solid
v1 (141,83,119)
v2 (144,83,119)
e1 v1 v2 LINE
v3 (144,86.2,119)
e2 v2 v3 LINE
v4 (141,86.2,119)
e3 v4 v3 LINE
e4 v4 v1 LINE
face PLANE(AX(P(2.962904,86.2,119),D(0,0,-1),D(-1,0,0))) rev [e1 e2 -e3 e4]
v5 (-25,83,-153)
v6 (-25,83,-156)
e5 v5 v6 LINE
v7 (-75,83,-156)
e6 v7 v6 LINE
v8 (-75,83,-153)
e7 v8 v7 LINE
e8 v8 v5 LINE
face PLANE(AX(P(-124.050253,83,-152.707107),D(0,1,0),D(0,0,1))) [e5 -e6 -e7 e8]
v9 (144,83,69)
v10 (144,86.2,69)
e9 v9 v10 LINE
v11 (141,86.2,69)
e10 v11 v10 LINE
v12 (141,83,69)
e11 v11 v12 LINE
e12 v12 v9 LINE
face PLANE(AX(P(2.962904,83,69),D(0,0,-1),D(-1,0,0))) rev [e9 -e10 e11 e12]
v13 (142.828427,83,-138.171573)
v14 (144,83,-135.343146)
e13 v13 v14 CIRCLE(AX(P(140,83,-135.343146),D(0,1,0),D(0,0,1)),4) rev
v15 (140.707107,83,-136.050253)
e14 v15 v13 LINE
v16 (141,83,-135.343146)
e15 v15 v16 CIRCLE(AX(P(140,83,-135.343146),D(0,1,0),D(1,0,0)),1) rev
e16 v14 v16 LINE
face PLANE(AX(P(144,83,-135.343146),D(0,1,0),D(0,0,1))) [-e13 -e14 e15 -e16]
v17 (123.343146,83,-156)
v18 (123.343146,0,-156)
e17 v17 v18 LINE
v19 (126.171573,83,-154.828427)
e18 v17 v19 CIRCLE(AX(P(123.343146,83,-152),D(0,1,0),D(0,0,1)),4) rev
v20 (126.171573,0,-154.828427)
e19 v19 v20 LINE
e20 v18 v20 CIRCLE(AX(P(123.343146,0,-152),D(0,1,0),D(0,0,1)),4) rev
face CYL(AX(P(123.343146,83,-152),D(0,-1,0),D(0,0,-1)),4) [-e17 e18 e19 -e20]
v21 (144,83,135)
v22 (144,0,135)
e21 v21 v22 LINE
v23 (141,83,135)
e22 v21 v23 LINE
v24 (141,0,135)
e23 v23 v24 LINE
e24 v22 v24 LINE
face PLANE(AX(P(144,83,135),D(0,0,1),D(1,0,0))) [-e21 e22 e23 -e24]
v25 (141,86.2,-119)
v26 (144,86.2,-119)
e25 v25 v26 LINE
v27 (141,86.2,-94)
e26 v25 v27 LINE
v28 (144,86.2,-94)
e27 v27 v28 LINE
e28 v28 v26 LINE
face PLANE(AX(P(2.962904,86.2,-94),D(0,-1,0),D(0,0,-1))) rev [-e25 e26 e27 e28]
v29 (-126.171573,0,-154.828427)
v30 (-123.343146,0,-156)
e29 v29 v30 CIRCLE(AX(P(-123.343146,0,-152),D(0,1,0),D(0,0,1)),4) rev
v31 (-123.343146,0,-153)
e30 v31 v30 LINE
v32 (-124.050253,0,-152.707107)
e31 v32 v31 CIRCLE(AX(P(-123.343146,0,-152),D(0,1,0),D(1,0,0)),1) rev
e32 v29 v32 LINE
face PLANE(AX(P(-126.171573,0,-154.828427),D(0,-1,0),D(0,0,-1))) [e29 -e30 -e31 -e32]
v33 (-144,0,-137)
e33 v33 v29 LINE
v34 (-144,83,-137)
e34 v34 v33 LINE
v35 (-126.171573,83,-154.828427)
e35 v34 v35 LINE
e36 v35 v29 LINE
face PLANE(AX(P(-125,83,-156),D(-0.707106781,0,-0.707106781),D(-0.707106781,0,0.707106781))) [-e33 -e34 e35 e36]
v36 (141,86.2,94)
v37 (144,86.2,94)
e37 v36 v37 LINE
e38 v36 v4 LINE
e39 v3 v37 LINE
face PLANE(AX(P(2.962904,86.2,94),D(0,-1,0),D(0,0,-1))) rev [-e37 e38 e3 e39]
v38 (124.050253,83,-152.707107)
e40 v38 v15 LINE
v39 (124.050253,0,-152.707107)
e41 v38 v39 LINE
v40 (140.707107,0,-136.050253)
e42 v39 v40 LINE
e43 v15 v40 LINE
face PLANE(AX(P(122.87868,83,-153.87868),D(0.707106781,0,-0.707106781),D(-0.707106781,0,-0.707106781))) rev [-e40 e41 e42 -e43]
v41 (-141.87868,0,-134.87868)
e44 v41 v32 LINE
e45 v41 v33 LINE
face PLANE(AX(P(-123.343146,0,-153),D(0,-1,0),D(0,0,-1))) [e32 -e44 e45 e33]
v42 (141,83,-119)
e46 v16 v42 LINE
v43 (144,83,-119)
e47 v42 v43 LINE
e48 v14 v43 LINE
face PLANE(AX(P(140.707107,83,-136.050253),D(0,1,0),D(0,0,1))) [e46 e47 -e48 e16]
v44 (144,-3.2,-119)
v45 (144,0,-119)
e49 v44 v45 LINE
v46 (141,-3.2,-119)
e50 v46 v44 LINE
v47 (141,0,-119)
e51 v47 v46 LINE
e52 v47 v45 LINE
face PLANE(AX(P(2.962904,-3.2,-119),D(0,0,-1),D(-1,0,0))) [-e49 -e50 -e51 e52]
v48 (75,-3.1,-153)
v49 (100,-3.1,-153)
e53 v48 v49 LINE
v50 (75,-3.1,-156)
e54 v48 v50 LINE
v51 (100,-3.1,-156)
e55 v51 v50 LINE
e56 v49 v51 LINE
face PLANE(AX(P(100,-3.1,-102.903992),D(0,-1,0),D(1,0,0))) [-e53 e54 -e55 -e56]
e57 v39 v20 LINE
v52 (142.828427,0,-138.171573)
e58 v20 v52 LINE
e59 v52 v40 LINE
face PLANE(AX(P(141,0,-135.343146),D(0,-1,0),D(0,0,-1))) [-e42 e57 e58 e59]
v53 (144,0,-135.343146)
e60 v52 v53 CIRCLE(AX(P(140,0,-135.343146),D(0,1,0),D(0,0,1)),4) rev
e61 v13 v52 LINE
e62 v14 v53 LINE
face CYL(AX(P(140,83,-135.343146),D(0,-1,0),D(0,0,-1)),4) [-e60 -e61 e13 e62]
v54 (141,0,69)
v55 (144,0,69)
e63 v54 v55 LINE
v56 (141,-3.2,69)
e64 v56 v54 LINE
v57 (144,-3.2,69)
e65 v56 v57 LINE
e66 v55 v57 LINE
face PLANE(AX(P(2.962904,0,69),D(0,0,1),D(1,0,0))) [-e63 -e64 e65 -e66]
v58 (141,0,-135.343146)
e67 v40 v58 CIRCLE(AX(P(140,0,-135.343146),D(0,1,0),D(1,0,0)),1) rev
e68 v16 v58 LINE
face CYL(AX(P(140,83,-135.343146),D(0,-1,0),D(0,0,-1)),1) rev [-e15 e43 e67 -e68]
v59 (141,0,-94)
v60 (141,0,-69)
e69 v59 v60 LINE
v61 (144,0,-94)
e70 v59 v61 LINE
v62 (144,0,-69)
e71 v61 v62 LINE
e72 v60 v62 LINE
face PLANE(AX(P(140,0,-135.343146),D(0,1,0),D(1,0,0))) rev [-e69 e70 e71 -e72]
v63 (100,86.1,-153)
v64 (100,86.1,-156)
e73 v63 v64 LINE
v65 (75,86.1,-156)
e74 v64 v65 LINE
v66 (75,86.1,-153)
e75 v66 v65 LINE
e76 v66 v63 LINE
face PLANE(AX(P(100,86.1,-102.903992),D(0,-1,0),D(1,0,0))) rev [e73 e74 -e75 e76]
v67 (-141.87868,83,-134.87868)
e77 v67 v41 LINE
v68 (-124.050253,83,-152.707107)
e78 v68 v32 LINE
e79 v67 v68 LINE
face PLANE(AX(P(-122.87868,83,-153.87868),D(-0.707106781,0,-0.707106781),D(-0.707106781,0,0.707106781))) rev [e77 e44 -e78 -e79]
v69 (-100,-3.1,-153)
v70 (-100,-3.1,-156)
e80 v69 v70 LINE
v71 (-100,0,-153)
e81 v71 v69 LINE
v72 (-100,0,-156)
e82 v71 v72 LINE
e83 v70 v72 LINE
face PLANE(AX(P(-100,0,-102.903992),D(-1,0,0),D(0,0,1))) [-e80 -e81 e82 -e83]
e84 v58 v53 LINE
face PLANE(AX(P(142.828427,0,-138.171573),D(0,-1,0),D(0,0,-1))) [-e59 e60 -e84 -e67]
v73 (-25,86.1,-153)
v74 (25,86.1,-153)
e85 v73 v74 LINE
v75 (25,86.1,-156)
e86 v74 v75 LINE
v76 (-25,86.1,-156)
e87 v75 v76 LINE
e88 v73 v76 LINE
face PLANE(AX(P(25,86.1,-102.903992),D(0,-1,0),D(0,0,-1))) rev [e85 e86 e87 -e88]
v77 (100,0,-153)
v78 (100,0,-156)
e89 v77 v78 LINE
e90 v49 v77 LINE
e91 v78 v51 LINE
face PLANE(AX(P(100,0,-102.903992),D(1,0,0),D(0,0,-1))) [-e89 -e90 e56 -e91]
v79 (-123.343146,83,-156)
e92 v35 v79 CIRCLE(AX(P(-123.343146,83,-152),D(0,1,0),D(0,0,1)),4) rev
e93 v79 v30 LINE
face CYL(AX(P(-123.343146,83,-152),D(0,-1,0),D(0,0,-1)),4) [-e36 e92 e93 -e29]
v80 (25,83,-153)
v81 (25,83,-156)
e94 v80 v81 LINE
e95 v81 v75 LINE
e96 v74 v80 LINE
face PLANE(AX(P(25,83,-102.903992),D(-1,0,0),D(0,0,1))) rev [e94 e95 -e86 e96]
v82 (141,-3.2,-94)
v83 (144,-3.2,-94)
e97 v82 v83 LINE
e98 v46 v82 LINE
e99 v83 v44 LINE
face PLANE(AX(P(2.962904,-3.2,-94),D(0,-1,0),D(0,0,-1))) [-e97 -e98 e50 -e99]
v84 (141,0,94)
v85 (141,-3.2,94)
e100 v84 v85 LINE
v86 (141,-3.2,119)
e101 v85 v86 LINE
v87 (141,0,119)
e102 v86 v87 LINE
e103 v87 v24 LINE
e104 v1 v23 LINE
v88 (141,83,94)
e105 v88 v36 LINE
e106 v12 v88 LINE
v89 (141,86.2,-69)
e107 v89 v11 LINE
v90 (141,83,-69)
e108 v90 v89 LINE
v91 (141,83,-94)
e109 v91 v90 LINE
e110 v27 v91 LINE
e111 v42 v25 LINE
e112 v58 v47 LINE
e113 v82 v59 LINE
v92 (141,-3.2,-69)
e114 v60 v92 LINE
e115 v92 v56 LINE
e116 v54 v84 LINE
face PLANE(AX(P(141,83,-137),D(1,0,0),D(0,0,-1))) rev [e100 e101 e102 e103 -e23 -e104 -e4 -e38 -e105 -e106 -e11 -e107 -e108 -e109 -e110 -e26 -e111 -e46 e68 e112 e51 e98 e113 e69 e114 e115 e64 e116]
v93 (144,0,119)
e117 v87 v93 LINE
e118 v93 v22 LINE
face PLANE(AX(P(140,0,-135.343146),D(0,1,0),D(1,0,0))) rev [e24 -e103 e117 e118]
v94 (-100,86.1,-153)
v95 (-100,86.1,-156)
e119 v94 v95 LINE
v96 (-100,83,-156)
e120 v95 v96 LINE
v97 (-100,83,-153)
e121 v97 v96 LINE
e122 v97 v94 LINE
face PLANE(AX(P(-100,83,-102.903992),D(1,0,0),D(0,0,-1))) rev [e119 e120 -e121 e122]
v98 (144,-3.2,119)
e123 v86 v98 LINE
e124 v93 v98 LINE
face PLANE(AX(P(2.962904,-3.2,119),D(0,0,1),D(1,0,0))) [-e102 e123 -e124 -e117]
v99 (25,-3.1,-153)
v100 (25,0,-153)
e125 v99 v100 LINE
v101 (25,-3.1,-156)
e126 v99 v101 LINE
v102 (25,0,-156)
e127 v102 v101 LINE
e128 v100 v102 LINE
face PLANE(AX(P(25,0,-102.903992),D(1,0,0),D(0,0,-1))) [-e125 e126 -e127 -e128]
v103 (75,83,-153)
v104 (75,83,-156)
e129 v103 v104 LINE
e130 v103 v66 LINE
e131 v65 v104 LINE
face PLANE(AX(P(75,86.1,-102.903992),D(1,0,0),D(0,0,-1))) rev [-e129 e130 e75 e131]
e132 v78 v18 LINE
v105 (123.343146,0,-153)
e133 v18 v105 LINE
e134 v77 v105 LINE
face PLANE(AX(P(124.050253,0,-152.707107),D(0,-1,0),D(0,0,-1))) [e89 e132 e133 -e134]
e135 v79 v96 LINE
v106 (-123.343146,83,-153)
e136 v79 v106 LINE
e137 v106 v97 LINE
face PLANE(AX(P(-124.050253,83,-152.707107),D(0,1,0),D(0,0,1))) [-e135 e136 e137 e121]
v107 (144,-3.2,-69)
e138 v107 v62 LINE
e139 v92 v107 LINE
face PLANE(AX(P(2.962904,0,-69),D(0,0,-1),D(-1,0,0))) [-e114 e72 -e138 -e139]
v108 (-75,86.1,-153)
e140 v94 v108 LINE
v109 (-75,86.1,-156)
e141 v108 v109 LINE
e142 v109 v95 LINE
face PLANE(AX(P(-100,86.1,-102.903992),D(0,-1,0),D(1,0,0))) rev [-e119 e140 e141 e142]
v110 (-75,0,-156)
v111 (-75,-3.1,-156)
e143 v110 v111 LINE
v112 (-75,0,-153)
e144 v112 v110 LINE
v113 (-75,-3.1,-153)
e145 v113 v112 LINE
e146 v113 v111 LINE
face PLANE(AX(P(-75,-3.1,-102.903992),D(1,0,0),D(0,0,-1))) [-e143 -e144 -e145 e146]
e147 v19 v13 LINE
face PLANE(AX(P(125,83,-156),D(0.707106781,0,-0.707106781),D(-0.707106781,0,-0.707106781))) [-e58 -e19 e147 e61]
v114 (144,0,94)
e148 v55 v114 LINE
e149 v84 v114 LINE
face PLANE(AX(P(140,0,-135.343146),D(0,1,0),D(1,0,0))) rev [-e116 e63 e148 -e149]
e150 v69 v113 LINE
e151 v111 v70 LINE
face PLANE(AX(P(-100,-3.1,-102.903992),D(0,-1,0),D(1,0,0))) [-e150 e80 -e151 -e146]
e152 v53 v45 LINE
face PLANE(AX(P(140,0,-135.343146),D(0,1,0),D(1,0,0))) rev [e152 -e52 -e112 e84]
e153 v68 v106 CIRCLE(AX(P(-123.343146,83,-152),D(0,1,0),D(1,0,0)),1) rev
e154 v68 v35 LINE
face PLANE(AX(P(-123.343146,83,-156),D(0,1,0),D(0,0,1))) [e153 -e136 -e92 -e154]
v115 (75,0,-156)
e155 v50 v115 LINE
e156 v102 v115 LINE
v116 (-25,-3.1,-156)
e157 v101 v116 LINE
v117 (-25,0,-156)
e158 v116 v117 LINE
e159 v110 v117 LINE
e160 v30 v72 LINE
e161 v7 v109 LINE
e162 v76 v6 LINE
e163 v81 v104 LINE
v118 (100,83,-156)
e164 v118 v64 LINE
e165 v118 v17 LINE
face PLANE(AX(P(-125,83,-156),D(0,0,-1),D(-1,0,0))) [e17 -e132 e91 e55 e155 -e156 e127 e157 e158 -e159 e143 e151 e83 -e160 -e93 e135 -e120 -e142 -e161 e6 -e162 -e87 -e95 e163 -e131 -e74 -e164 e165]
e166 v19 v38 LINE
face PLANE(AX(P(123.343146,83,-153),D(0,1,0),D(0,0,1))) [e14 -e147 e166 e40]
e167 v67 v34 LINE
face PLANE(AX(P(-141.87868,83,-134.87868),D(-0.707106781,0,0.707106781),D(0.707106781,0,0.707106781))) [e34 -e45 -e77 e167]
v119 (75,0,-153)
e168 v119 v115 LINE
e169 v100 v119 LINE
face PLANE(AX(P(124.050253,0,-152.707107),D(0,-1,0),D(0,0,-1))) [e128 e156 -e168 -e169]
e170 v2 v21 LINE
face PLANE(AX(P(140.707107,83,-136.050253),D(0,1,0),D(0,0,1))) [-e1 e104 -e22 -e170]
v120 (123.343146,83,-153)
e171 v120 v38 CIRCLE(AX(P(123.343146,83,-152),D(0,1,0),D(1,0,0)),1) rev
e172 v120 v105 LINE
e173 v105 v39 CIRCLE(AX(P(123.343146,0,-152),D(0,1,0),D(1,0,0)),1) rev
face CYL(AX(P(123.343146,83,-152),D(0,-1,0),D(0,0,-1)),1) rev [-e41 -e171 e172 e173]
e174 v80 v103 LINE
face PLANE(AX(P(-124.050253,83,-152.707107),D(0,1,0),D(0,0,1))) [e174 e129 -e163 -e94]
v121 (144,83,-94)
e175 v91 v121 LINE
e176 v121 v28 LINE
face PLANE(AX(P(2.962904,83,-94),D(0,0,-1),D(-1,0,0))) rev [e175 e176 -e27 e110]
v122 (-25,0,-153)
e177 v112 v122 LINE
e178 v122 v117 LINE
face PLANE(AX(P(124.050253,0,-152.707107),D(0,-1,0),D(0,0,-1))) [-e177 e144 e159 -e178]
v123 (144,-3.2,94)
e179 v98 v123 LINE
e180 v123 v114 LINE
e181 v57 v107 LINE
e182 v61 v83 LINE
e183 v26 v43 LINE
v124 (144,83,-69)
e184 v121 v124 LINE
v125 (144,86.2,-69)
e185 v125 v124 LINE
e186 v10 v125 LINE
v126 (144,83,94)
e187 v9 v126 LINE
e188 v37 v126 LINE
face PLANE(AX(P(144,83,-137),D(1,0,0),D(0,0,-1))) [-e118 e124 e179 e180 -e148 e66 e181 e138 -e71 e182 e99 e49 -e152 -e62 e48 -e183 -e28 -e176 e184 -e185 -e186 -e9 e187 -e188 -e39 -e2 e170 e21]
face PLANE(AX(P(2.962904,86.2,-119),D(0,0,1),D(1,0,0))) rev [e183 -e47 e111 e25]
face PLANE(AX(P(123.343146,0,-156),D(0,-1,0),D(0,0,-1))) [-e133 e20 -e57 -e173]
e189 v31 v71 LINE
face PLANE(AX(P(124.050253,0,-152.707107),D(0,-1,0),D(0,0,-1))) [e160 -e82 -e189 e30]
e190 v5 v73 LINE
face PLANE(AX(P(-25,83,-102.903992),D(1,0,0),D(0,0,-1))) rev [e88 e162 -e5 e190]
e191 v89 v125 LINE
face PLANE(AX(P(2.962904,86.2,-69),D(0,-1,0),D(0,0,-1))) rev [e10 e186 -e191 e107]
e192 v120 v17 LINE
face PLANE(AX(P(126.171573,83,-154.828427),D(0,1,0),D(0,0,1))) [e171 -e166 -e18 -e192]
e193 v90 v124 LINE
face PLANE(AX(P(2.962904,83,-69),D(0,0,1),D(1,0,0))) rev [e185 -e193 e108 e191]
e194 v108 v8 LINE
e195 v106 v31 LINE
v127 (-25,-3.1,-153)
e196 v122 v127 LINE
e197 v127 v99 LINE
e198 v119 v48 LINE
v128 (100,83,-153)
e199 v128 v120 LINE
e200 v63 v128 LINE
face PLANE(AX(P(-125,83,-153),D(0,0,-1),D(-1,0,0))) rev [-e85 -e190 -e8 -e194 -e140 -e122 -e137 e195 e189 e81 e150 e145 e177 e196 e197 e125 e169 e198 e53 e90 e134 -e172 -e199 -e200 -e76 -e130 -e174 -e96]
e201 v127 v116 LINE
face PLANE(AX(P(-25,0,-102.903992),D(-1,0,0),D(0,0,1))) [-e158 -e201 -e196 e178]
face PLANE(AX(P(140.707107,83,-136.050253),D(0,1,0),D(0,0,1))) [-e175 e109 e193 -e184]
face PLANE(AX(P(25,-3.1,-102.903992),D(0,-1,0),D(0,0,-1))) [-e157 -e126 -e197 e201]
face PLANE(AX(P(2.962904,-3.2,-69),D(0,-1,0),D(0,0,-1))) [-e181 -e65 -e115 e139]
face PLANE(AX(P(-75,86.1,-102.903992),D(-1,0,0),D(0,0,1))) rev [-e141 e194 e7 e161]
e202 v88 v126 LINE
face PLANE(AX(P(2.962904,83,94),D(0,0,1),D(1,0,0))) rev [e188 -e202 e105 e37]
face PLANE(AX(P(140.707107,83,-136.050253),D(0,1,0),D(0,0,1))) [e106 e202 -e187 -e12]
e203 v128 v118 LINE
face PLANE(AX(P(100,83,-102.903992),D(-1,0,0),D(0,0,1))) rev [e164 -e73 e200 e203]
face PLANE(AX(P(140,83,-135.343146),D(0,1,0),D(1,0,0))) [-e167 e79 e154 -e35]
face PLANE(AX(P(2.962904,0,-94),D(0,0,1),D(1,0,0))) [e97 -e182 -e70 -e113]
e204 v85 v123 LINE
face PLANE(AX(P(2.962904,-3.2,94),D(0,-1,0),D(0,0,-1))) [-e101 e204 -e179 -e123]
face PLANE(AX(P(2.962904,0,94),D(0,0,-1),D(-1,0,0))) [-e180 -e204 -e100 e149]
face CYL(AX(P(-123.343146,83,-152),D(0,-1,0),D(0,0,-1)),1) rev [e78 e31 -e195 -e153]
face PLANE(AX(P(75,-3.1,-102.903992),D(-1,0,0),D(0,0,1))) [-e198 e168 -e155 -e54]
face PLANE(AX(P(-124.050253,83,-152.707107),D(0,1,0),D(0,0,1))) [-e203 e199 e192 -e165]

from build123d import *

# Parameters (mm, degrees)
BASE_FLANGE1_DEPTH  = 83
SKETCH2_W           = 50
SKETCH2_H           = 3.1
SKETCH2_W_2         = 25
BOSS_EXTRUDE1_DEPTH = 3
SKETCH3_W           = 138
SKETCH3_H           = 3.2
SKETCH3_W_2         = 25
BOSS_EXTRUDE2_DEPTH = 3


# Sheet-metal steps are written as plain solids
with BuildPart() as part:
    # Sketch1 → Base-Flange1 (new body)
    with BuildSketch(Plane(origin=(0, 0, 0), x_dir=(1, 0, 0), z_dir=(0, 1, 0))):
        with BuildLine():
            Line((-144, 137), (-126.171572875, 154.828427125))
            ThreePointArc((-126.171572875, 154.828427125), (-124.87387948, 155.69551813), (-123.343145751, 156))
            Line((-123.343145751, 156), (123.343145751, 156))
            ThreePointArc((123.343145751, 156), (124.87387948, 155.69551813), (126.171572875, 154.828427125))
            Line((126.171572875, 154.828427125), (142.828427125, 138.171572875))
            ThreePointArc((142.828427125, 138.171572875), (143.69551813, 136.87387948), (144, 135.343145751))
            Line((144, 135.343145751), (144, -135))
            Line((144, -135), (141, -135))
            Line((141, -135), (141, 135.343145751))
            ThreePointArc((141, 135.343145751), (140.923879533, 135.725829183), (140.707106781, 136.050252532))
            Line((140.707106781, 136.050252532), (124.050252532, 152.707106781))
            ThreePointArc((124.050252532, 152.707106781), (123.725829183, 152.923879533), (123.343145751, 153))
            Line((123.343145751, 153), (-123.343145751, 153))
            ThreePointArc((-123.343145751, 153), (-123.725829183, 152.923879533), (-124.050252532, 152.707106781))
            Line((-124.050252532, 152.707106781), (-141.878679656, 134.878679656))
            Line((-141.878679656, 134.878679656), (-144, 137))
        make_face()
    extrude(amount=BASE_FLANGE1_DEPTH)

    # Sketch2 → Boss-Extrude1 (add)
    with BuildSketch(Plane(origin=(0, 0, -156), x_dir=(-1, 0, 0), z_dir=(0, 0, -1))):
        with Locations((0, -1.55)):
            Rectangle(SKETCH2_W, SKETCH2_H)
        with Locations((-87.5, -1.55)):
            Rectangle(SKETCH2_W_2, SKETCH2_H)
        with Locations((87.5, -1.55)):
            Rectangle(SKETCH2_W_2, SKETCH2_H)
    boss_extrude1 = extrude(amount=-BOSS_EXTRUDE1_DEPTH)

    # Sketch3 → Boss-Extrude2 (add)
    with BuildSketch(Plane(origin=(144, 0, 0), x_dir=(0, 0, -1), z_dir=(1, 0, 0))):
        with Locations((0, -1.6)):
            Rectangle(SKETCH3_W, SKETCH3_H)
        with Locations((106.5, -1.6)):
            Rectangle(SKETCH3_W_2, SKETCH3_H)
        with Locations((-106.5, -1.6)):
            Rectangle(SKETCH3_W_2, SKETCH3_H)
    boss_extrude2 = extrude(amount=-BOSS_EXTRUDE2_DEPTH)

    # Mirror1: Boss-Extrude1, Boss-Extrude2 across plane
    add(boss_extrude1.mirror(Plane.ZX.offset(41.5)))
    add(boss_extrude2.mirror(Plane.ZX.offset(41.5)))


solid = part.part
